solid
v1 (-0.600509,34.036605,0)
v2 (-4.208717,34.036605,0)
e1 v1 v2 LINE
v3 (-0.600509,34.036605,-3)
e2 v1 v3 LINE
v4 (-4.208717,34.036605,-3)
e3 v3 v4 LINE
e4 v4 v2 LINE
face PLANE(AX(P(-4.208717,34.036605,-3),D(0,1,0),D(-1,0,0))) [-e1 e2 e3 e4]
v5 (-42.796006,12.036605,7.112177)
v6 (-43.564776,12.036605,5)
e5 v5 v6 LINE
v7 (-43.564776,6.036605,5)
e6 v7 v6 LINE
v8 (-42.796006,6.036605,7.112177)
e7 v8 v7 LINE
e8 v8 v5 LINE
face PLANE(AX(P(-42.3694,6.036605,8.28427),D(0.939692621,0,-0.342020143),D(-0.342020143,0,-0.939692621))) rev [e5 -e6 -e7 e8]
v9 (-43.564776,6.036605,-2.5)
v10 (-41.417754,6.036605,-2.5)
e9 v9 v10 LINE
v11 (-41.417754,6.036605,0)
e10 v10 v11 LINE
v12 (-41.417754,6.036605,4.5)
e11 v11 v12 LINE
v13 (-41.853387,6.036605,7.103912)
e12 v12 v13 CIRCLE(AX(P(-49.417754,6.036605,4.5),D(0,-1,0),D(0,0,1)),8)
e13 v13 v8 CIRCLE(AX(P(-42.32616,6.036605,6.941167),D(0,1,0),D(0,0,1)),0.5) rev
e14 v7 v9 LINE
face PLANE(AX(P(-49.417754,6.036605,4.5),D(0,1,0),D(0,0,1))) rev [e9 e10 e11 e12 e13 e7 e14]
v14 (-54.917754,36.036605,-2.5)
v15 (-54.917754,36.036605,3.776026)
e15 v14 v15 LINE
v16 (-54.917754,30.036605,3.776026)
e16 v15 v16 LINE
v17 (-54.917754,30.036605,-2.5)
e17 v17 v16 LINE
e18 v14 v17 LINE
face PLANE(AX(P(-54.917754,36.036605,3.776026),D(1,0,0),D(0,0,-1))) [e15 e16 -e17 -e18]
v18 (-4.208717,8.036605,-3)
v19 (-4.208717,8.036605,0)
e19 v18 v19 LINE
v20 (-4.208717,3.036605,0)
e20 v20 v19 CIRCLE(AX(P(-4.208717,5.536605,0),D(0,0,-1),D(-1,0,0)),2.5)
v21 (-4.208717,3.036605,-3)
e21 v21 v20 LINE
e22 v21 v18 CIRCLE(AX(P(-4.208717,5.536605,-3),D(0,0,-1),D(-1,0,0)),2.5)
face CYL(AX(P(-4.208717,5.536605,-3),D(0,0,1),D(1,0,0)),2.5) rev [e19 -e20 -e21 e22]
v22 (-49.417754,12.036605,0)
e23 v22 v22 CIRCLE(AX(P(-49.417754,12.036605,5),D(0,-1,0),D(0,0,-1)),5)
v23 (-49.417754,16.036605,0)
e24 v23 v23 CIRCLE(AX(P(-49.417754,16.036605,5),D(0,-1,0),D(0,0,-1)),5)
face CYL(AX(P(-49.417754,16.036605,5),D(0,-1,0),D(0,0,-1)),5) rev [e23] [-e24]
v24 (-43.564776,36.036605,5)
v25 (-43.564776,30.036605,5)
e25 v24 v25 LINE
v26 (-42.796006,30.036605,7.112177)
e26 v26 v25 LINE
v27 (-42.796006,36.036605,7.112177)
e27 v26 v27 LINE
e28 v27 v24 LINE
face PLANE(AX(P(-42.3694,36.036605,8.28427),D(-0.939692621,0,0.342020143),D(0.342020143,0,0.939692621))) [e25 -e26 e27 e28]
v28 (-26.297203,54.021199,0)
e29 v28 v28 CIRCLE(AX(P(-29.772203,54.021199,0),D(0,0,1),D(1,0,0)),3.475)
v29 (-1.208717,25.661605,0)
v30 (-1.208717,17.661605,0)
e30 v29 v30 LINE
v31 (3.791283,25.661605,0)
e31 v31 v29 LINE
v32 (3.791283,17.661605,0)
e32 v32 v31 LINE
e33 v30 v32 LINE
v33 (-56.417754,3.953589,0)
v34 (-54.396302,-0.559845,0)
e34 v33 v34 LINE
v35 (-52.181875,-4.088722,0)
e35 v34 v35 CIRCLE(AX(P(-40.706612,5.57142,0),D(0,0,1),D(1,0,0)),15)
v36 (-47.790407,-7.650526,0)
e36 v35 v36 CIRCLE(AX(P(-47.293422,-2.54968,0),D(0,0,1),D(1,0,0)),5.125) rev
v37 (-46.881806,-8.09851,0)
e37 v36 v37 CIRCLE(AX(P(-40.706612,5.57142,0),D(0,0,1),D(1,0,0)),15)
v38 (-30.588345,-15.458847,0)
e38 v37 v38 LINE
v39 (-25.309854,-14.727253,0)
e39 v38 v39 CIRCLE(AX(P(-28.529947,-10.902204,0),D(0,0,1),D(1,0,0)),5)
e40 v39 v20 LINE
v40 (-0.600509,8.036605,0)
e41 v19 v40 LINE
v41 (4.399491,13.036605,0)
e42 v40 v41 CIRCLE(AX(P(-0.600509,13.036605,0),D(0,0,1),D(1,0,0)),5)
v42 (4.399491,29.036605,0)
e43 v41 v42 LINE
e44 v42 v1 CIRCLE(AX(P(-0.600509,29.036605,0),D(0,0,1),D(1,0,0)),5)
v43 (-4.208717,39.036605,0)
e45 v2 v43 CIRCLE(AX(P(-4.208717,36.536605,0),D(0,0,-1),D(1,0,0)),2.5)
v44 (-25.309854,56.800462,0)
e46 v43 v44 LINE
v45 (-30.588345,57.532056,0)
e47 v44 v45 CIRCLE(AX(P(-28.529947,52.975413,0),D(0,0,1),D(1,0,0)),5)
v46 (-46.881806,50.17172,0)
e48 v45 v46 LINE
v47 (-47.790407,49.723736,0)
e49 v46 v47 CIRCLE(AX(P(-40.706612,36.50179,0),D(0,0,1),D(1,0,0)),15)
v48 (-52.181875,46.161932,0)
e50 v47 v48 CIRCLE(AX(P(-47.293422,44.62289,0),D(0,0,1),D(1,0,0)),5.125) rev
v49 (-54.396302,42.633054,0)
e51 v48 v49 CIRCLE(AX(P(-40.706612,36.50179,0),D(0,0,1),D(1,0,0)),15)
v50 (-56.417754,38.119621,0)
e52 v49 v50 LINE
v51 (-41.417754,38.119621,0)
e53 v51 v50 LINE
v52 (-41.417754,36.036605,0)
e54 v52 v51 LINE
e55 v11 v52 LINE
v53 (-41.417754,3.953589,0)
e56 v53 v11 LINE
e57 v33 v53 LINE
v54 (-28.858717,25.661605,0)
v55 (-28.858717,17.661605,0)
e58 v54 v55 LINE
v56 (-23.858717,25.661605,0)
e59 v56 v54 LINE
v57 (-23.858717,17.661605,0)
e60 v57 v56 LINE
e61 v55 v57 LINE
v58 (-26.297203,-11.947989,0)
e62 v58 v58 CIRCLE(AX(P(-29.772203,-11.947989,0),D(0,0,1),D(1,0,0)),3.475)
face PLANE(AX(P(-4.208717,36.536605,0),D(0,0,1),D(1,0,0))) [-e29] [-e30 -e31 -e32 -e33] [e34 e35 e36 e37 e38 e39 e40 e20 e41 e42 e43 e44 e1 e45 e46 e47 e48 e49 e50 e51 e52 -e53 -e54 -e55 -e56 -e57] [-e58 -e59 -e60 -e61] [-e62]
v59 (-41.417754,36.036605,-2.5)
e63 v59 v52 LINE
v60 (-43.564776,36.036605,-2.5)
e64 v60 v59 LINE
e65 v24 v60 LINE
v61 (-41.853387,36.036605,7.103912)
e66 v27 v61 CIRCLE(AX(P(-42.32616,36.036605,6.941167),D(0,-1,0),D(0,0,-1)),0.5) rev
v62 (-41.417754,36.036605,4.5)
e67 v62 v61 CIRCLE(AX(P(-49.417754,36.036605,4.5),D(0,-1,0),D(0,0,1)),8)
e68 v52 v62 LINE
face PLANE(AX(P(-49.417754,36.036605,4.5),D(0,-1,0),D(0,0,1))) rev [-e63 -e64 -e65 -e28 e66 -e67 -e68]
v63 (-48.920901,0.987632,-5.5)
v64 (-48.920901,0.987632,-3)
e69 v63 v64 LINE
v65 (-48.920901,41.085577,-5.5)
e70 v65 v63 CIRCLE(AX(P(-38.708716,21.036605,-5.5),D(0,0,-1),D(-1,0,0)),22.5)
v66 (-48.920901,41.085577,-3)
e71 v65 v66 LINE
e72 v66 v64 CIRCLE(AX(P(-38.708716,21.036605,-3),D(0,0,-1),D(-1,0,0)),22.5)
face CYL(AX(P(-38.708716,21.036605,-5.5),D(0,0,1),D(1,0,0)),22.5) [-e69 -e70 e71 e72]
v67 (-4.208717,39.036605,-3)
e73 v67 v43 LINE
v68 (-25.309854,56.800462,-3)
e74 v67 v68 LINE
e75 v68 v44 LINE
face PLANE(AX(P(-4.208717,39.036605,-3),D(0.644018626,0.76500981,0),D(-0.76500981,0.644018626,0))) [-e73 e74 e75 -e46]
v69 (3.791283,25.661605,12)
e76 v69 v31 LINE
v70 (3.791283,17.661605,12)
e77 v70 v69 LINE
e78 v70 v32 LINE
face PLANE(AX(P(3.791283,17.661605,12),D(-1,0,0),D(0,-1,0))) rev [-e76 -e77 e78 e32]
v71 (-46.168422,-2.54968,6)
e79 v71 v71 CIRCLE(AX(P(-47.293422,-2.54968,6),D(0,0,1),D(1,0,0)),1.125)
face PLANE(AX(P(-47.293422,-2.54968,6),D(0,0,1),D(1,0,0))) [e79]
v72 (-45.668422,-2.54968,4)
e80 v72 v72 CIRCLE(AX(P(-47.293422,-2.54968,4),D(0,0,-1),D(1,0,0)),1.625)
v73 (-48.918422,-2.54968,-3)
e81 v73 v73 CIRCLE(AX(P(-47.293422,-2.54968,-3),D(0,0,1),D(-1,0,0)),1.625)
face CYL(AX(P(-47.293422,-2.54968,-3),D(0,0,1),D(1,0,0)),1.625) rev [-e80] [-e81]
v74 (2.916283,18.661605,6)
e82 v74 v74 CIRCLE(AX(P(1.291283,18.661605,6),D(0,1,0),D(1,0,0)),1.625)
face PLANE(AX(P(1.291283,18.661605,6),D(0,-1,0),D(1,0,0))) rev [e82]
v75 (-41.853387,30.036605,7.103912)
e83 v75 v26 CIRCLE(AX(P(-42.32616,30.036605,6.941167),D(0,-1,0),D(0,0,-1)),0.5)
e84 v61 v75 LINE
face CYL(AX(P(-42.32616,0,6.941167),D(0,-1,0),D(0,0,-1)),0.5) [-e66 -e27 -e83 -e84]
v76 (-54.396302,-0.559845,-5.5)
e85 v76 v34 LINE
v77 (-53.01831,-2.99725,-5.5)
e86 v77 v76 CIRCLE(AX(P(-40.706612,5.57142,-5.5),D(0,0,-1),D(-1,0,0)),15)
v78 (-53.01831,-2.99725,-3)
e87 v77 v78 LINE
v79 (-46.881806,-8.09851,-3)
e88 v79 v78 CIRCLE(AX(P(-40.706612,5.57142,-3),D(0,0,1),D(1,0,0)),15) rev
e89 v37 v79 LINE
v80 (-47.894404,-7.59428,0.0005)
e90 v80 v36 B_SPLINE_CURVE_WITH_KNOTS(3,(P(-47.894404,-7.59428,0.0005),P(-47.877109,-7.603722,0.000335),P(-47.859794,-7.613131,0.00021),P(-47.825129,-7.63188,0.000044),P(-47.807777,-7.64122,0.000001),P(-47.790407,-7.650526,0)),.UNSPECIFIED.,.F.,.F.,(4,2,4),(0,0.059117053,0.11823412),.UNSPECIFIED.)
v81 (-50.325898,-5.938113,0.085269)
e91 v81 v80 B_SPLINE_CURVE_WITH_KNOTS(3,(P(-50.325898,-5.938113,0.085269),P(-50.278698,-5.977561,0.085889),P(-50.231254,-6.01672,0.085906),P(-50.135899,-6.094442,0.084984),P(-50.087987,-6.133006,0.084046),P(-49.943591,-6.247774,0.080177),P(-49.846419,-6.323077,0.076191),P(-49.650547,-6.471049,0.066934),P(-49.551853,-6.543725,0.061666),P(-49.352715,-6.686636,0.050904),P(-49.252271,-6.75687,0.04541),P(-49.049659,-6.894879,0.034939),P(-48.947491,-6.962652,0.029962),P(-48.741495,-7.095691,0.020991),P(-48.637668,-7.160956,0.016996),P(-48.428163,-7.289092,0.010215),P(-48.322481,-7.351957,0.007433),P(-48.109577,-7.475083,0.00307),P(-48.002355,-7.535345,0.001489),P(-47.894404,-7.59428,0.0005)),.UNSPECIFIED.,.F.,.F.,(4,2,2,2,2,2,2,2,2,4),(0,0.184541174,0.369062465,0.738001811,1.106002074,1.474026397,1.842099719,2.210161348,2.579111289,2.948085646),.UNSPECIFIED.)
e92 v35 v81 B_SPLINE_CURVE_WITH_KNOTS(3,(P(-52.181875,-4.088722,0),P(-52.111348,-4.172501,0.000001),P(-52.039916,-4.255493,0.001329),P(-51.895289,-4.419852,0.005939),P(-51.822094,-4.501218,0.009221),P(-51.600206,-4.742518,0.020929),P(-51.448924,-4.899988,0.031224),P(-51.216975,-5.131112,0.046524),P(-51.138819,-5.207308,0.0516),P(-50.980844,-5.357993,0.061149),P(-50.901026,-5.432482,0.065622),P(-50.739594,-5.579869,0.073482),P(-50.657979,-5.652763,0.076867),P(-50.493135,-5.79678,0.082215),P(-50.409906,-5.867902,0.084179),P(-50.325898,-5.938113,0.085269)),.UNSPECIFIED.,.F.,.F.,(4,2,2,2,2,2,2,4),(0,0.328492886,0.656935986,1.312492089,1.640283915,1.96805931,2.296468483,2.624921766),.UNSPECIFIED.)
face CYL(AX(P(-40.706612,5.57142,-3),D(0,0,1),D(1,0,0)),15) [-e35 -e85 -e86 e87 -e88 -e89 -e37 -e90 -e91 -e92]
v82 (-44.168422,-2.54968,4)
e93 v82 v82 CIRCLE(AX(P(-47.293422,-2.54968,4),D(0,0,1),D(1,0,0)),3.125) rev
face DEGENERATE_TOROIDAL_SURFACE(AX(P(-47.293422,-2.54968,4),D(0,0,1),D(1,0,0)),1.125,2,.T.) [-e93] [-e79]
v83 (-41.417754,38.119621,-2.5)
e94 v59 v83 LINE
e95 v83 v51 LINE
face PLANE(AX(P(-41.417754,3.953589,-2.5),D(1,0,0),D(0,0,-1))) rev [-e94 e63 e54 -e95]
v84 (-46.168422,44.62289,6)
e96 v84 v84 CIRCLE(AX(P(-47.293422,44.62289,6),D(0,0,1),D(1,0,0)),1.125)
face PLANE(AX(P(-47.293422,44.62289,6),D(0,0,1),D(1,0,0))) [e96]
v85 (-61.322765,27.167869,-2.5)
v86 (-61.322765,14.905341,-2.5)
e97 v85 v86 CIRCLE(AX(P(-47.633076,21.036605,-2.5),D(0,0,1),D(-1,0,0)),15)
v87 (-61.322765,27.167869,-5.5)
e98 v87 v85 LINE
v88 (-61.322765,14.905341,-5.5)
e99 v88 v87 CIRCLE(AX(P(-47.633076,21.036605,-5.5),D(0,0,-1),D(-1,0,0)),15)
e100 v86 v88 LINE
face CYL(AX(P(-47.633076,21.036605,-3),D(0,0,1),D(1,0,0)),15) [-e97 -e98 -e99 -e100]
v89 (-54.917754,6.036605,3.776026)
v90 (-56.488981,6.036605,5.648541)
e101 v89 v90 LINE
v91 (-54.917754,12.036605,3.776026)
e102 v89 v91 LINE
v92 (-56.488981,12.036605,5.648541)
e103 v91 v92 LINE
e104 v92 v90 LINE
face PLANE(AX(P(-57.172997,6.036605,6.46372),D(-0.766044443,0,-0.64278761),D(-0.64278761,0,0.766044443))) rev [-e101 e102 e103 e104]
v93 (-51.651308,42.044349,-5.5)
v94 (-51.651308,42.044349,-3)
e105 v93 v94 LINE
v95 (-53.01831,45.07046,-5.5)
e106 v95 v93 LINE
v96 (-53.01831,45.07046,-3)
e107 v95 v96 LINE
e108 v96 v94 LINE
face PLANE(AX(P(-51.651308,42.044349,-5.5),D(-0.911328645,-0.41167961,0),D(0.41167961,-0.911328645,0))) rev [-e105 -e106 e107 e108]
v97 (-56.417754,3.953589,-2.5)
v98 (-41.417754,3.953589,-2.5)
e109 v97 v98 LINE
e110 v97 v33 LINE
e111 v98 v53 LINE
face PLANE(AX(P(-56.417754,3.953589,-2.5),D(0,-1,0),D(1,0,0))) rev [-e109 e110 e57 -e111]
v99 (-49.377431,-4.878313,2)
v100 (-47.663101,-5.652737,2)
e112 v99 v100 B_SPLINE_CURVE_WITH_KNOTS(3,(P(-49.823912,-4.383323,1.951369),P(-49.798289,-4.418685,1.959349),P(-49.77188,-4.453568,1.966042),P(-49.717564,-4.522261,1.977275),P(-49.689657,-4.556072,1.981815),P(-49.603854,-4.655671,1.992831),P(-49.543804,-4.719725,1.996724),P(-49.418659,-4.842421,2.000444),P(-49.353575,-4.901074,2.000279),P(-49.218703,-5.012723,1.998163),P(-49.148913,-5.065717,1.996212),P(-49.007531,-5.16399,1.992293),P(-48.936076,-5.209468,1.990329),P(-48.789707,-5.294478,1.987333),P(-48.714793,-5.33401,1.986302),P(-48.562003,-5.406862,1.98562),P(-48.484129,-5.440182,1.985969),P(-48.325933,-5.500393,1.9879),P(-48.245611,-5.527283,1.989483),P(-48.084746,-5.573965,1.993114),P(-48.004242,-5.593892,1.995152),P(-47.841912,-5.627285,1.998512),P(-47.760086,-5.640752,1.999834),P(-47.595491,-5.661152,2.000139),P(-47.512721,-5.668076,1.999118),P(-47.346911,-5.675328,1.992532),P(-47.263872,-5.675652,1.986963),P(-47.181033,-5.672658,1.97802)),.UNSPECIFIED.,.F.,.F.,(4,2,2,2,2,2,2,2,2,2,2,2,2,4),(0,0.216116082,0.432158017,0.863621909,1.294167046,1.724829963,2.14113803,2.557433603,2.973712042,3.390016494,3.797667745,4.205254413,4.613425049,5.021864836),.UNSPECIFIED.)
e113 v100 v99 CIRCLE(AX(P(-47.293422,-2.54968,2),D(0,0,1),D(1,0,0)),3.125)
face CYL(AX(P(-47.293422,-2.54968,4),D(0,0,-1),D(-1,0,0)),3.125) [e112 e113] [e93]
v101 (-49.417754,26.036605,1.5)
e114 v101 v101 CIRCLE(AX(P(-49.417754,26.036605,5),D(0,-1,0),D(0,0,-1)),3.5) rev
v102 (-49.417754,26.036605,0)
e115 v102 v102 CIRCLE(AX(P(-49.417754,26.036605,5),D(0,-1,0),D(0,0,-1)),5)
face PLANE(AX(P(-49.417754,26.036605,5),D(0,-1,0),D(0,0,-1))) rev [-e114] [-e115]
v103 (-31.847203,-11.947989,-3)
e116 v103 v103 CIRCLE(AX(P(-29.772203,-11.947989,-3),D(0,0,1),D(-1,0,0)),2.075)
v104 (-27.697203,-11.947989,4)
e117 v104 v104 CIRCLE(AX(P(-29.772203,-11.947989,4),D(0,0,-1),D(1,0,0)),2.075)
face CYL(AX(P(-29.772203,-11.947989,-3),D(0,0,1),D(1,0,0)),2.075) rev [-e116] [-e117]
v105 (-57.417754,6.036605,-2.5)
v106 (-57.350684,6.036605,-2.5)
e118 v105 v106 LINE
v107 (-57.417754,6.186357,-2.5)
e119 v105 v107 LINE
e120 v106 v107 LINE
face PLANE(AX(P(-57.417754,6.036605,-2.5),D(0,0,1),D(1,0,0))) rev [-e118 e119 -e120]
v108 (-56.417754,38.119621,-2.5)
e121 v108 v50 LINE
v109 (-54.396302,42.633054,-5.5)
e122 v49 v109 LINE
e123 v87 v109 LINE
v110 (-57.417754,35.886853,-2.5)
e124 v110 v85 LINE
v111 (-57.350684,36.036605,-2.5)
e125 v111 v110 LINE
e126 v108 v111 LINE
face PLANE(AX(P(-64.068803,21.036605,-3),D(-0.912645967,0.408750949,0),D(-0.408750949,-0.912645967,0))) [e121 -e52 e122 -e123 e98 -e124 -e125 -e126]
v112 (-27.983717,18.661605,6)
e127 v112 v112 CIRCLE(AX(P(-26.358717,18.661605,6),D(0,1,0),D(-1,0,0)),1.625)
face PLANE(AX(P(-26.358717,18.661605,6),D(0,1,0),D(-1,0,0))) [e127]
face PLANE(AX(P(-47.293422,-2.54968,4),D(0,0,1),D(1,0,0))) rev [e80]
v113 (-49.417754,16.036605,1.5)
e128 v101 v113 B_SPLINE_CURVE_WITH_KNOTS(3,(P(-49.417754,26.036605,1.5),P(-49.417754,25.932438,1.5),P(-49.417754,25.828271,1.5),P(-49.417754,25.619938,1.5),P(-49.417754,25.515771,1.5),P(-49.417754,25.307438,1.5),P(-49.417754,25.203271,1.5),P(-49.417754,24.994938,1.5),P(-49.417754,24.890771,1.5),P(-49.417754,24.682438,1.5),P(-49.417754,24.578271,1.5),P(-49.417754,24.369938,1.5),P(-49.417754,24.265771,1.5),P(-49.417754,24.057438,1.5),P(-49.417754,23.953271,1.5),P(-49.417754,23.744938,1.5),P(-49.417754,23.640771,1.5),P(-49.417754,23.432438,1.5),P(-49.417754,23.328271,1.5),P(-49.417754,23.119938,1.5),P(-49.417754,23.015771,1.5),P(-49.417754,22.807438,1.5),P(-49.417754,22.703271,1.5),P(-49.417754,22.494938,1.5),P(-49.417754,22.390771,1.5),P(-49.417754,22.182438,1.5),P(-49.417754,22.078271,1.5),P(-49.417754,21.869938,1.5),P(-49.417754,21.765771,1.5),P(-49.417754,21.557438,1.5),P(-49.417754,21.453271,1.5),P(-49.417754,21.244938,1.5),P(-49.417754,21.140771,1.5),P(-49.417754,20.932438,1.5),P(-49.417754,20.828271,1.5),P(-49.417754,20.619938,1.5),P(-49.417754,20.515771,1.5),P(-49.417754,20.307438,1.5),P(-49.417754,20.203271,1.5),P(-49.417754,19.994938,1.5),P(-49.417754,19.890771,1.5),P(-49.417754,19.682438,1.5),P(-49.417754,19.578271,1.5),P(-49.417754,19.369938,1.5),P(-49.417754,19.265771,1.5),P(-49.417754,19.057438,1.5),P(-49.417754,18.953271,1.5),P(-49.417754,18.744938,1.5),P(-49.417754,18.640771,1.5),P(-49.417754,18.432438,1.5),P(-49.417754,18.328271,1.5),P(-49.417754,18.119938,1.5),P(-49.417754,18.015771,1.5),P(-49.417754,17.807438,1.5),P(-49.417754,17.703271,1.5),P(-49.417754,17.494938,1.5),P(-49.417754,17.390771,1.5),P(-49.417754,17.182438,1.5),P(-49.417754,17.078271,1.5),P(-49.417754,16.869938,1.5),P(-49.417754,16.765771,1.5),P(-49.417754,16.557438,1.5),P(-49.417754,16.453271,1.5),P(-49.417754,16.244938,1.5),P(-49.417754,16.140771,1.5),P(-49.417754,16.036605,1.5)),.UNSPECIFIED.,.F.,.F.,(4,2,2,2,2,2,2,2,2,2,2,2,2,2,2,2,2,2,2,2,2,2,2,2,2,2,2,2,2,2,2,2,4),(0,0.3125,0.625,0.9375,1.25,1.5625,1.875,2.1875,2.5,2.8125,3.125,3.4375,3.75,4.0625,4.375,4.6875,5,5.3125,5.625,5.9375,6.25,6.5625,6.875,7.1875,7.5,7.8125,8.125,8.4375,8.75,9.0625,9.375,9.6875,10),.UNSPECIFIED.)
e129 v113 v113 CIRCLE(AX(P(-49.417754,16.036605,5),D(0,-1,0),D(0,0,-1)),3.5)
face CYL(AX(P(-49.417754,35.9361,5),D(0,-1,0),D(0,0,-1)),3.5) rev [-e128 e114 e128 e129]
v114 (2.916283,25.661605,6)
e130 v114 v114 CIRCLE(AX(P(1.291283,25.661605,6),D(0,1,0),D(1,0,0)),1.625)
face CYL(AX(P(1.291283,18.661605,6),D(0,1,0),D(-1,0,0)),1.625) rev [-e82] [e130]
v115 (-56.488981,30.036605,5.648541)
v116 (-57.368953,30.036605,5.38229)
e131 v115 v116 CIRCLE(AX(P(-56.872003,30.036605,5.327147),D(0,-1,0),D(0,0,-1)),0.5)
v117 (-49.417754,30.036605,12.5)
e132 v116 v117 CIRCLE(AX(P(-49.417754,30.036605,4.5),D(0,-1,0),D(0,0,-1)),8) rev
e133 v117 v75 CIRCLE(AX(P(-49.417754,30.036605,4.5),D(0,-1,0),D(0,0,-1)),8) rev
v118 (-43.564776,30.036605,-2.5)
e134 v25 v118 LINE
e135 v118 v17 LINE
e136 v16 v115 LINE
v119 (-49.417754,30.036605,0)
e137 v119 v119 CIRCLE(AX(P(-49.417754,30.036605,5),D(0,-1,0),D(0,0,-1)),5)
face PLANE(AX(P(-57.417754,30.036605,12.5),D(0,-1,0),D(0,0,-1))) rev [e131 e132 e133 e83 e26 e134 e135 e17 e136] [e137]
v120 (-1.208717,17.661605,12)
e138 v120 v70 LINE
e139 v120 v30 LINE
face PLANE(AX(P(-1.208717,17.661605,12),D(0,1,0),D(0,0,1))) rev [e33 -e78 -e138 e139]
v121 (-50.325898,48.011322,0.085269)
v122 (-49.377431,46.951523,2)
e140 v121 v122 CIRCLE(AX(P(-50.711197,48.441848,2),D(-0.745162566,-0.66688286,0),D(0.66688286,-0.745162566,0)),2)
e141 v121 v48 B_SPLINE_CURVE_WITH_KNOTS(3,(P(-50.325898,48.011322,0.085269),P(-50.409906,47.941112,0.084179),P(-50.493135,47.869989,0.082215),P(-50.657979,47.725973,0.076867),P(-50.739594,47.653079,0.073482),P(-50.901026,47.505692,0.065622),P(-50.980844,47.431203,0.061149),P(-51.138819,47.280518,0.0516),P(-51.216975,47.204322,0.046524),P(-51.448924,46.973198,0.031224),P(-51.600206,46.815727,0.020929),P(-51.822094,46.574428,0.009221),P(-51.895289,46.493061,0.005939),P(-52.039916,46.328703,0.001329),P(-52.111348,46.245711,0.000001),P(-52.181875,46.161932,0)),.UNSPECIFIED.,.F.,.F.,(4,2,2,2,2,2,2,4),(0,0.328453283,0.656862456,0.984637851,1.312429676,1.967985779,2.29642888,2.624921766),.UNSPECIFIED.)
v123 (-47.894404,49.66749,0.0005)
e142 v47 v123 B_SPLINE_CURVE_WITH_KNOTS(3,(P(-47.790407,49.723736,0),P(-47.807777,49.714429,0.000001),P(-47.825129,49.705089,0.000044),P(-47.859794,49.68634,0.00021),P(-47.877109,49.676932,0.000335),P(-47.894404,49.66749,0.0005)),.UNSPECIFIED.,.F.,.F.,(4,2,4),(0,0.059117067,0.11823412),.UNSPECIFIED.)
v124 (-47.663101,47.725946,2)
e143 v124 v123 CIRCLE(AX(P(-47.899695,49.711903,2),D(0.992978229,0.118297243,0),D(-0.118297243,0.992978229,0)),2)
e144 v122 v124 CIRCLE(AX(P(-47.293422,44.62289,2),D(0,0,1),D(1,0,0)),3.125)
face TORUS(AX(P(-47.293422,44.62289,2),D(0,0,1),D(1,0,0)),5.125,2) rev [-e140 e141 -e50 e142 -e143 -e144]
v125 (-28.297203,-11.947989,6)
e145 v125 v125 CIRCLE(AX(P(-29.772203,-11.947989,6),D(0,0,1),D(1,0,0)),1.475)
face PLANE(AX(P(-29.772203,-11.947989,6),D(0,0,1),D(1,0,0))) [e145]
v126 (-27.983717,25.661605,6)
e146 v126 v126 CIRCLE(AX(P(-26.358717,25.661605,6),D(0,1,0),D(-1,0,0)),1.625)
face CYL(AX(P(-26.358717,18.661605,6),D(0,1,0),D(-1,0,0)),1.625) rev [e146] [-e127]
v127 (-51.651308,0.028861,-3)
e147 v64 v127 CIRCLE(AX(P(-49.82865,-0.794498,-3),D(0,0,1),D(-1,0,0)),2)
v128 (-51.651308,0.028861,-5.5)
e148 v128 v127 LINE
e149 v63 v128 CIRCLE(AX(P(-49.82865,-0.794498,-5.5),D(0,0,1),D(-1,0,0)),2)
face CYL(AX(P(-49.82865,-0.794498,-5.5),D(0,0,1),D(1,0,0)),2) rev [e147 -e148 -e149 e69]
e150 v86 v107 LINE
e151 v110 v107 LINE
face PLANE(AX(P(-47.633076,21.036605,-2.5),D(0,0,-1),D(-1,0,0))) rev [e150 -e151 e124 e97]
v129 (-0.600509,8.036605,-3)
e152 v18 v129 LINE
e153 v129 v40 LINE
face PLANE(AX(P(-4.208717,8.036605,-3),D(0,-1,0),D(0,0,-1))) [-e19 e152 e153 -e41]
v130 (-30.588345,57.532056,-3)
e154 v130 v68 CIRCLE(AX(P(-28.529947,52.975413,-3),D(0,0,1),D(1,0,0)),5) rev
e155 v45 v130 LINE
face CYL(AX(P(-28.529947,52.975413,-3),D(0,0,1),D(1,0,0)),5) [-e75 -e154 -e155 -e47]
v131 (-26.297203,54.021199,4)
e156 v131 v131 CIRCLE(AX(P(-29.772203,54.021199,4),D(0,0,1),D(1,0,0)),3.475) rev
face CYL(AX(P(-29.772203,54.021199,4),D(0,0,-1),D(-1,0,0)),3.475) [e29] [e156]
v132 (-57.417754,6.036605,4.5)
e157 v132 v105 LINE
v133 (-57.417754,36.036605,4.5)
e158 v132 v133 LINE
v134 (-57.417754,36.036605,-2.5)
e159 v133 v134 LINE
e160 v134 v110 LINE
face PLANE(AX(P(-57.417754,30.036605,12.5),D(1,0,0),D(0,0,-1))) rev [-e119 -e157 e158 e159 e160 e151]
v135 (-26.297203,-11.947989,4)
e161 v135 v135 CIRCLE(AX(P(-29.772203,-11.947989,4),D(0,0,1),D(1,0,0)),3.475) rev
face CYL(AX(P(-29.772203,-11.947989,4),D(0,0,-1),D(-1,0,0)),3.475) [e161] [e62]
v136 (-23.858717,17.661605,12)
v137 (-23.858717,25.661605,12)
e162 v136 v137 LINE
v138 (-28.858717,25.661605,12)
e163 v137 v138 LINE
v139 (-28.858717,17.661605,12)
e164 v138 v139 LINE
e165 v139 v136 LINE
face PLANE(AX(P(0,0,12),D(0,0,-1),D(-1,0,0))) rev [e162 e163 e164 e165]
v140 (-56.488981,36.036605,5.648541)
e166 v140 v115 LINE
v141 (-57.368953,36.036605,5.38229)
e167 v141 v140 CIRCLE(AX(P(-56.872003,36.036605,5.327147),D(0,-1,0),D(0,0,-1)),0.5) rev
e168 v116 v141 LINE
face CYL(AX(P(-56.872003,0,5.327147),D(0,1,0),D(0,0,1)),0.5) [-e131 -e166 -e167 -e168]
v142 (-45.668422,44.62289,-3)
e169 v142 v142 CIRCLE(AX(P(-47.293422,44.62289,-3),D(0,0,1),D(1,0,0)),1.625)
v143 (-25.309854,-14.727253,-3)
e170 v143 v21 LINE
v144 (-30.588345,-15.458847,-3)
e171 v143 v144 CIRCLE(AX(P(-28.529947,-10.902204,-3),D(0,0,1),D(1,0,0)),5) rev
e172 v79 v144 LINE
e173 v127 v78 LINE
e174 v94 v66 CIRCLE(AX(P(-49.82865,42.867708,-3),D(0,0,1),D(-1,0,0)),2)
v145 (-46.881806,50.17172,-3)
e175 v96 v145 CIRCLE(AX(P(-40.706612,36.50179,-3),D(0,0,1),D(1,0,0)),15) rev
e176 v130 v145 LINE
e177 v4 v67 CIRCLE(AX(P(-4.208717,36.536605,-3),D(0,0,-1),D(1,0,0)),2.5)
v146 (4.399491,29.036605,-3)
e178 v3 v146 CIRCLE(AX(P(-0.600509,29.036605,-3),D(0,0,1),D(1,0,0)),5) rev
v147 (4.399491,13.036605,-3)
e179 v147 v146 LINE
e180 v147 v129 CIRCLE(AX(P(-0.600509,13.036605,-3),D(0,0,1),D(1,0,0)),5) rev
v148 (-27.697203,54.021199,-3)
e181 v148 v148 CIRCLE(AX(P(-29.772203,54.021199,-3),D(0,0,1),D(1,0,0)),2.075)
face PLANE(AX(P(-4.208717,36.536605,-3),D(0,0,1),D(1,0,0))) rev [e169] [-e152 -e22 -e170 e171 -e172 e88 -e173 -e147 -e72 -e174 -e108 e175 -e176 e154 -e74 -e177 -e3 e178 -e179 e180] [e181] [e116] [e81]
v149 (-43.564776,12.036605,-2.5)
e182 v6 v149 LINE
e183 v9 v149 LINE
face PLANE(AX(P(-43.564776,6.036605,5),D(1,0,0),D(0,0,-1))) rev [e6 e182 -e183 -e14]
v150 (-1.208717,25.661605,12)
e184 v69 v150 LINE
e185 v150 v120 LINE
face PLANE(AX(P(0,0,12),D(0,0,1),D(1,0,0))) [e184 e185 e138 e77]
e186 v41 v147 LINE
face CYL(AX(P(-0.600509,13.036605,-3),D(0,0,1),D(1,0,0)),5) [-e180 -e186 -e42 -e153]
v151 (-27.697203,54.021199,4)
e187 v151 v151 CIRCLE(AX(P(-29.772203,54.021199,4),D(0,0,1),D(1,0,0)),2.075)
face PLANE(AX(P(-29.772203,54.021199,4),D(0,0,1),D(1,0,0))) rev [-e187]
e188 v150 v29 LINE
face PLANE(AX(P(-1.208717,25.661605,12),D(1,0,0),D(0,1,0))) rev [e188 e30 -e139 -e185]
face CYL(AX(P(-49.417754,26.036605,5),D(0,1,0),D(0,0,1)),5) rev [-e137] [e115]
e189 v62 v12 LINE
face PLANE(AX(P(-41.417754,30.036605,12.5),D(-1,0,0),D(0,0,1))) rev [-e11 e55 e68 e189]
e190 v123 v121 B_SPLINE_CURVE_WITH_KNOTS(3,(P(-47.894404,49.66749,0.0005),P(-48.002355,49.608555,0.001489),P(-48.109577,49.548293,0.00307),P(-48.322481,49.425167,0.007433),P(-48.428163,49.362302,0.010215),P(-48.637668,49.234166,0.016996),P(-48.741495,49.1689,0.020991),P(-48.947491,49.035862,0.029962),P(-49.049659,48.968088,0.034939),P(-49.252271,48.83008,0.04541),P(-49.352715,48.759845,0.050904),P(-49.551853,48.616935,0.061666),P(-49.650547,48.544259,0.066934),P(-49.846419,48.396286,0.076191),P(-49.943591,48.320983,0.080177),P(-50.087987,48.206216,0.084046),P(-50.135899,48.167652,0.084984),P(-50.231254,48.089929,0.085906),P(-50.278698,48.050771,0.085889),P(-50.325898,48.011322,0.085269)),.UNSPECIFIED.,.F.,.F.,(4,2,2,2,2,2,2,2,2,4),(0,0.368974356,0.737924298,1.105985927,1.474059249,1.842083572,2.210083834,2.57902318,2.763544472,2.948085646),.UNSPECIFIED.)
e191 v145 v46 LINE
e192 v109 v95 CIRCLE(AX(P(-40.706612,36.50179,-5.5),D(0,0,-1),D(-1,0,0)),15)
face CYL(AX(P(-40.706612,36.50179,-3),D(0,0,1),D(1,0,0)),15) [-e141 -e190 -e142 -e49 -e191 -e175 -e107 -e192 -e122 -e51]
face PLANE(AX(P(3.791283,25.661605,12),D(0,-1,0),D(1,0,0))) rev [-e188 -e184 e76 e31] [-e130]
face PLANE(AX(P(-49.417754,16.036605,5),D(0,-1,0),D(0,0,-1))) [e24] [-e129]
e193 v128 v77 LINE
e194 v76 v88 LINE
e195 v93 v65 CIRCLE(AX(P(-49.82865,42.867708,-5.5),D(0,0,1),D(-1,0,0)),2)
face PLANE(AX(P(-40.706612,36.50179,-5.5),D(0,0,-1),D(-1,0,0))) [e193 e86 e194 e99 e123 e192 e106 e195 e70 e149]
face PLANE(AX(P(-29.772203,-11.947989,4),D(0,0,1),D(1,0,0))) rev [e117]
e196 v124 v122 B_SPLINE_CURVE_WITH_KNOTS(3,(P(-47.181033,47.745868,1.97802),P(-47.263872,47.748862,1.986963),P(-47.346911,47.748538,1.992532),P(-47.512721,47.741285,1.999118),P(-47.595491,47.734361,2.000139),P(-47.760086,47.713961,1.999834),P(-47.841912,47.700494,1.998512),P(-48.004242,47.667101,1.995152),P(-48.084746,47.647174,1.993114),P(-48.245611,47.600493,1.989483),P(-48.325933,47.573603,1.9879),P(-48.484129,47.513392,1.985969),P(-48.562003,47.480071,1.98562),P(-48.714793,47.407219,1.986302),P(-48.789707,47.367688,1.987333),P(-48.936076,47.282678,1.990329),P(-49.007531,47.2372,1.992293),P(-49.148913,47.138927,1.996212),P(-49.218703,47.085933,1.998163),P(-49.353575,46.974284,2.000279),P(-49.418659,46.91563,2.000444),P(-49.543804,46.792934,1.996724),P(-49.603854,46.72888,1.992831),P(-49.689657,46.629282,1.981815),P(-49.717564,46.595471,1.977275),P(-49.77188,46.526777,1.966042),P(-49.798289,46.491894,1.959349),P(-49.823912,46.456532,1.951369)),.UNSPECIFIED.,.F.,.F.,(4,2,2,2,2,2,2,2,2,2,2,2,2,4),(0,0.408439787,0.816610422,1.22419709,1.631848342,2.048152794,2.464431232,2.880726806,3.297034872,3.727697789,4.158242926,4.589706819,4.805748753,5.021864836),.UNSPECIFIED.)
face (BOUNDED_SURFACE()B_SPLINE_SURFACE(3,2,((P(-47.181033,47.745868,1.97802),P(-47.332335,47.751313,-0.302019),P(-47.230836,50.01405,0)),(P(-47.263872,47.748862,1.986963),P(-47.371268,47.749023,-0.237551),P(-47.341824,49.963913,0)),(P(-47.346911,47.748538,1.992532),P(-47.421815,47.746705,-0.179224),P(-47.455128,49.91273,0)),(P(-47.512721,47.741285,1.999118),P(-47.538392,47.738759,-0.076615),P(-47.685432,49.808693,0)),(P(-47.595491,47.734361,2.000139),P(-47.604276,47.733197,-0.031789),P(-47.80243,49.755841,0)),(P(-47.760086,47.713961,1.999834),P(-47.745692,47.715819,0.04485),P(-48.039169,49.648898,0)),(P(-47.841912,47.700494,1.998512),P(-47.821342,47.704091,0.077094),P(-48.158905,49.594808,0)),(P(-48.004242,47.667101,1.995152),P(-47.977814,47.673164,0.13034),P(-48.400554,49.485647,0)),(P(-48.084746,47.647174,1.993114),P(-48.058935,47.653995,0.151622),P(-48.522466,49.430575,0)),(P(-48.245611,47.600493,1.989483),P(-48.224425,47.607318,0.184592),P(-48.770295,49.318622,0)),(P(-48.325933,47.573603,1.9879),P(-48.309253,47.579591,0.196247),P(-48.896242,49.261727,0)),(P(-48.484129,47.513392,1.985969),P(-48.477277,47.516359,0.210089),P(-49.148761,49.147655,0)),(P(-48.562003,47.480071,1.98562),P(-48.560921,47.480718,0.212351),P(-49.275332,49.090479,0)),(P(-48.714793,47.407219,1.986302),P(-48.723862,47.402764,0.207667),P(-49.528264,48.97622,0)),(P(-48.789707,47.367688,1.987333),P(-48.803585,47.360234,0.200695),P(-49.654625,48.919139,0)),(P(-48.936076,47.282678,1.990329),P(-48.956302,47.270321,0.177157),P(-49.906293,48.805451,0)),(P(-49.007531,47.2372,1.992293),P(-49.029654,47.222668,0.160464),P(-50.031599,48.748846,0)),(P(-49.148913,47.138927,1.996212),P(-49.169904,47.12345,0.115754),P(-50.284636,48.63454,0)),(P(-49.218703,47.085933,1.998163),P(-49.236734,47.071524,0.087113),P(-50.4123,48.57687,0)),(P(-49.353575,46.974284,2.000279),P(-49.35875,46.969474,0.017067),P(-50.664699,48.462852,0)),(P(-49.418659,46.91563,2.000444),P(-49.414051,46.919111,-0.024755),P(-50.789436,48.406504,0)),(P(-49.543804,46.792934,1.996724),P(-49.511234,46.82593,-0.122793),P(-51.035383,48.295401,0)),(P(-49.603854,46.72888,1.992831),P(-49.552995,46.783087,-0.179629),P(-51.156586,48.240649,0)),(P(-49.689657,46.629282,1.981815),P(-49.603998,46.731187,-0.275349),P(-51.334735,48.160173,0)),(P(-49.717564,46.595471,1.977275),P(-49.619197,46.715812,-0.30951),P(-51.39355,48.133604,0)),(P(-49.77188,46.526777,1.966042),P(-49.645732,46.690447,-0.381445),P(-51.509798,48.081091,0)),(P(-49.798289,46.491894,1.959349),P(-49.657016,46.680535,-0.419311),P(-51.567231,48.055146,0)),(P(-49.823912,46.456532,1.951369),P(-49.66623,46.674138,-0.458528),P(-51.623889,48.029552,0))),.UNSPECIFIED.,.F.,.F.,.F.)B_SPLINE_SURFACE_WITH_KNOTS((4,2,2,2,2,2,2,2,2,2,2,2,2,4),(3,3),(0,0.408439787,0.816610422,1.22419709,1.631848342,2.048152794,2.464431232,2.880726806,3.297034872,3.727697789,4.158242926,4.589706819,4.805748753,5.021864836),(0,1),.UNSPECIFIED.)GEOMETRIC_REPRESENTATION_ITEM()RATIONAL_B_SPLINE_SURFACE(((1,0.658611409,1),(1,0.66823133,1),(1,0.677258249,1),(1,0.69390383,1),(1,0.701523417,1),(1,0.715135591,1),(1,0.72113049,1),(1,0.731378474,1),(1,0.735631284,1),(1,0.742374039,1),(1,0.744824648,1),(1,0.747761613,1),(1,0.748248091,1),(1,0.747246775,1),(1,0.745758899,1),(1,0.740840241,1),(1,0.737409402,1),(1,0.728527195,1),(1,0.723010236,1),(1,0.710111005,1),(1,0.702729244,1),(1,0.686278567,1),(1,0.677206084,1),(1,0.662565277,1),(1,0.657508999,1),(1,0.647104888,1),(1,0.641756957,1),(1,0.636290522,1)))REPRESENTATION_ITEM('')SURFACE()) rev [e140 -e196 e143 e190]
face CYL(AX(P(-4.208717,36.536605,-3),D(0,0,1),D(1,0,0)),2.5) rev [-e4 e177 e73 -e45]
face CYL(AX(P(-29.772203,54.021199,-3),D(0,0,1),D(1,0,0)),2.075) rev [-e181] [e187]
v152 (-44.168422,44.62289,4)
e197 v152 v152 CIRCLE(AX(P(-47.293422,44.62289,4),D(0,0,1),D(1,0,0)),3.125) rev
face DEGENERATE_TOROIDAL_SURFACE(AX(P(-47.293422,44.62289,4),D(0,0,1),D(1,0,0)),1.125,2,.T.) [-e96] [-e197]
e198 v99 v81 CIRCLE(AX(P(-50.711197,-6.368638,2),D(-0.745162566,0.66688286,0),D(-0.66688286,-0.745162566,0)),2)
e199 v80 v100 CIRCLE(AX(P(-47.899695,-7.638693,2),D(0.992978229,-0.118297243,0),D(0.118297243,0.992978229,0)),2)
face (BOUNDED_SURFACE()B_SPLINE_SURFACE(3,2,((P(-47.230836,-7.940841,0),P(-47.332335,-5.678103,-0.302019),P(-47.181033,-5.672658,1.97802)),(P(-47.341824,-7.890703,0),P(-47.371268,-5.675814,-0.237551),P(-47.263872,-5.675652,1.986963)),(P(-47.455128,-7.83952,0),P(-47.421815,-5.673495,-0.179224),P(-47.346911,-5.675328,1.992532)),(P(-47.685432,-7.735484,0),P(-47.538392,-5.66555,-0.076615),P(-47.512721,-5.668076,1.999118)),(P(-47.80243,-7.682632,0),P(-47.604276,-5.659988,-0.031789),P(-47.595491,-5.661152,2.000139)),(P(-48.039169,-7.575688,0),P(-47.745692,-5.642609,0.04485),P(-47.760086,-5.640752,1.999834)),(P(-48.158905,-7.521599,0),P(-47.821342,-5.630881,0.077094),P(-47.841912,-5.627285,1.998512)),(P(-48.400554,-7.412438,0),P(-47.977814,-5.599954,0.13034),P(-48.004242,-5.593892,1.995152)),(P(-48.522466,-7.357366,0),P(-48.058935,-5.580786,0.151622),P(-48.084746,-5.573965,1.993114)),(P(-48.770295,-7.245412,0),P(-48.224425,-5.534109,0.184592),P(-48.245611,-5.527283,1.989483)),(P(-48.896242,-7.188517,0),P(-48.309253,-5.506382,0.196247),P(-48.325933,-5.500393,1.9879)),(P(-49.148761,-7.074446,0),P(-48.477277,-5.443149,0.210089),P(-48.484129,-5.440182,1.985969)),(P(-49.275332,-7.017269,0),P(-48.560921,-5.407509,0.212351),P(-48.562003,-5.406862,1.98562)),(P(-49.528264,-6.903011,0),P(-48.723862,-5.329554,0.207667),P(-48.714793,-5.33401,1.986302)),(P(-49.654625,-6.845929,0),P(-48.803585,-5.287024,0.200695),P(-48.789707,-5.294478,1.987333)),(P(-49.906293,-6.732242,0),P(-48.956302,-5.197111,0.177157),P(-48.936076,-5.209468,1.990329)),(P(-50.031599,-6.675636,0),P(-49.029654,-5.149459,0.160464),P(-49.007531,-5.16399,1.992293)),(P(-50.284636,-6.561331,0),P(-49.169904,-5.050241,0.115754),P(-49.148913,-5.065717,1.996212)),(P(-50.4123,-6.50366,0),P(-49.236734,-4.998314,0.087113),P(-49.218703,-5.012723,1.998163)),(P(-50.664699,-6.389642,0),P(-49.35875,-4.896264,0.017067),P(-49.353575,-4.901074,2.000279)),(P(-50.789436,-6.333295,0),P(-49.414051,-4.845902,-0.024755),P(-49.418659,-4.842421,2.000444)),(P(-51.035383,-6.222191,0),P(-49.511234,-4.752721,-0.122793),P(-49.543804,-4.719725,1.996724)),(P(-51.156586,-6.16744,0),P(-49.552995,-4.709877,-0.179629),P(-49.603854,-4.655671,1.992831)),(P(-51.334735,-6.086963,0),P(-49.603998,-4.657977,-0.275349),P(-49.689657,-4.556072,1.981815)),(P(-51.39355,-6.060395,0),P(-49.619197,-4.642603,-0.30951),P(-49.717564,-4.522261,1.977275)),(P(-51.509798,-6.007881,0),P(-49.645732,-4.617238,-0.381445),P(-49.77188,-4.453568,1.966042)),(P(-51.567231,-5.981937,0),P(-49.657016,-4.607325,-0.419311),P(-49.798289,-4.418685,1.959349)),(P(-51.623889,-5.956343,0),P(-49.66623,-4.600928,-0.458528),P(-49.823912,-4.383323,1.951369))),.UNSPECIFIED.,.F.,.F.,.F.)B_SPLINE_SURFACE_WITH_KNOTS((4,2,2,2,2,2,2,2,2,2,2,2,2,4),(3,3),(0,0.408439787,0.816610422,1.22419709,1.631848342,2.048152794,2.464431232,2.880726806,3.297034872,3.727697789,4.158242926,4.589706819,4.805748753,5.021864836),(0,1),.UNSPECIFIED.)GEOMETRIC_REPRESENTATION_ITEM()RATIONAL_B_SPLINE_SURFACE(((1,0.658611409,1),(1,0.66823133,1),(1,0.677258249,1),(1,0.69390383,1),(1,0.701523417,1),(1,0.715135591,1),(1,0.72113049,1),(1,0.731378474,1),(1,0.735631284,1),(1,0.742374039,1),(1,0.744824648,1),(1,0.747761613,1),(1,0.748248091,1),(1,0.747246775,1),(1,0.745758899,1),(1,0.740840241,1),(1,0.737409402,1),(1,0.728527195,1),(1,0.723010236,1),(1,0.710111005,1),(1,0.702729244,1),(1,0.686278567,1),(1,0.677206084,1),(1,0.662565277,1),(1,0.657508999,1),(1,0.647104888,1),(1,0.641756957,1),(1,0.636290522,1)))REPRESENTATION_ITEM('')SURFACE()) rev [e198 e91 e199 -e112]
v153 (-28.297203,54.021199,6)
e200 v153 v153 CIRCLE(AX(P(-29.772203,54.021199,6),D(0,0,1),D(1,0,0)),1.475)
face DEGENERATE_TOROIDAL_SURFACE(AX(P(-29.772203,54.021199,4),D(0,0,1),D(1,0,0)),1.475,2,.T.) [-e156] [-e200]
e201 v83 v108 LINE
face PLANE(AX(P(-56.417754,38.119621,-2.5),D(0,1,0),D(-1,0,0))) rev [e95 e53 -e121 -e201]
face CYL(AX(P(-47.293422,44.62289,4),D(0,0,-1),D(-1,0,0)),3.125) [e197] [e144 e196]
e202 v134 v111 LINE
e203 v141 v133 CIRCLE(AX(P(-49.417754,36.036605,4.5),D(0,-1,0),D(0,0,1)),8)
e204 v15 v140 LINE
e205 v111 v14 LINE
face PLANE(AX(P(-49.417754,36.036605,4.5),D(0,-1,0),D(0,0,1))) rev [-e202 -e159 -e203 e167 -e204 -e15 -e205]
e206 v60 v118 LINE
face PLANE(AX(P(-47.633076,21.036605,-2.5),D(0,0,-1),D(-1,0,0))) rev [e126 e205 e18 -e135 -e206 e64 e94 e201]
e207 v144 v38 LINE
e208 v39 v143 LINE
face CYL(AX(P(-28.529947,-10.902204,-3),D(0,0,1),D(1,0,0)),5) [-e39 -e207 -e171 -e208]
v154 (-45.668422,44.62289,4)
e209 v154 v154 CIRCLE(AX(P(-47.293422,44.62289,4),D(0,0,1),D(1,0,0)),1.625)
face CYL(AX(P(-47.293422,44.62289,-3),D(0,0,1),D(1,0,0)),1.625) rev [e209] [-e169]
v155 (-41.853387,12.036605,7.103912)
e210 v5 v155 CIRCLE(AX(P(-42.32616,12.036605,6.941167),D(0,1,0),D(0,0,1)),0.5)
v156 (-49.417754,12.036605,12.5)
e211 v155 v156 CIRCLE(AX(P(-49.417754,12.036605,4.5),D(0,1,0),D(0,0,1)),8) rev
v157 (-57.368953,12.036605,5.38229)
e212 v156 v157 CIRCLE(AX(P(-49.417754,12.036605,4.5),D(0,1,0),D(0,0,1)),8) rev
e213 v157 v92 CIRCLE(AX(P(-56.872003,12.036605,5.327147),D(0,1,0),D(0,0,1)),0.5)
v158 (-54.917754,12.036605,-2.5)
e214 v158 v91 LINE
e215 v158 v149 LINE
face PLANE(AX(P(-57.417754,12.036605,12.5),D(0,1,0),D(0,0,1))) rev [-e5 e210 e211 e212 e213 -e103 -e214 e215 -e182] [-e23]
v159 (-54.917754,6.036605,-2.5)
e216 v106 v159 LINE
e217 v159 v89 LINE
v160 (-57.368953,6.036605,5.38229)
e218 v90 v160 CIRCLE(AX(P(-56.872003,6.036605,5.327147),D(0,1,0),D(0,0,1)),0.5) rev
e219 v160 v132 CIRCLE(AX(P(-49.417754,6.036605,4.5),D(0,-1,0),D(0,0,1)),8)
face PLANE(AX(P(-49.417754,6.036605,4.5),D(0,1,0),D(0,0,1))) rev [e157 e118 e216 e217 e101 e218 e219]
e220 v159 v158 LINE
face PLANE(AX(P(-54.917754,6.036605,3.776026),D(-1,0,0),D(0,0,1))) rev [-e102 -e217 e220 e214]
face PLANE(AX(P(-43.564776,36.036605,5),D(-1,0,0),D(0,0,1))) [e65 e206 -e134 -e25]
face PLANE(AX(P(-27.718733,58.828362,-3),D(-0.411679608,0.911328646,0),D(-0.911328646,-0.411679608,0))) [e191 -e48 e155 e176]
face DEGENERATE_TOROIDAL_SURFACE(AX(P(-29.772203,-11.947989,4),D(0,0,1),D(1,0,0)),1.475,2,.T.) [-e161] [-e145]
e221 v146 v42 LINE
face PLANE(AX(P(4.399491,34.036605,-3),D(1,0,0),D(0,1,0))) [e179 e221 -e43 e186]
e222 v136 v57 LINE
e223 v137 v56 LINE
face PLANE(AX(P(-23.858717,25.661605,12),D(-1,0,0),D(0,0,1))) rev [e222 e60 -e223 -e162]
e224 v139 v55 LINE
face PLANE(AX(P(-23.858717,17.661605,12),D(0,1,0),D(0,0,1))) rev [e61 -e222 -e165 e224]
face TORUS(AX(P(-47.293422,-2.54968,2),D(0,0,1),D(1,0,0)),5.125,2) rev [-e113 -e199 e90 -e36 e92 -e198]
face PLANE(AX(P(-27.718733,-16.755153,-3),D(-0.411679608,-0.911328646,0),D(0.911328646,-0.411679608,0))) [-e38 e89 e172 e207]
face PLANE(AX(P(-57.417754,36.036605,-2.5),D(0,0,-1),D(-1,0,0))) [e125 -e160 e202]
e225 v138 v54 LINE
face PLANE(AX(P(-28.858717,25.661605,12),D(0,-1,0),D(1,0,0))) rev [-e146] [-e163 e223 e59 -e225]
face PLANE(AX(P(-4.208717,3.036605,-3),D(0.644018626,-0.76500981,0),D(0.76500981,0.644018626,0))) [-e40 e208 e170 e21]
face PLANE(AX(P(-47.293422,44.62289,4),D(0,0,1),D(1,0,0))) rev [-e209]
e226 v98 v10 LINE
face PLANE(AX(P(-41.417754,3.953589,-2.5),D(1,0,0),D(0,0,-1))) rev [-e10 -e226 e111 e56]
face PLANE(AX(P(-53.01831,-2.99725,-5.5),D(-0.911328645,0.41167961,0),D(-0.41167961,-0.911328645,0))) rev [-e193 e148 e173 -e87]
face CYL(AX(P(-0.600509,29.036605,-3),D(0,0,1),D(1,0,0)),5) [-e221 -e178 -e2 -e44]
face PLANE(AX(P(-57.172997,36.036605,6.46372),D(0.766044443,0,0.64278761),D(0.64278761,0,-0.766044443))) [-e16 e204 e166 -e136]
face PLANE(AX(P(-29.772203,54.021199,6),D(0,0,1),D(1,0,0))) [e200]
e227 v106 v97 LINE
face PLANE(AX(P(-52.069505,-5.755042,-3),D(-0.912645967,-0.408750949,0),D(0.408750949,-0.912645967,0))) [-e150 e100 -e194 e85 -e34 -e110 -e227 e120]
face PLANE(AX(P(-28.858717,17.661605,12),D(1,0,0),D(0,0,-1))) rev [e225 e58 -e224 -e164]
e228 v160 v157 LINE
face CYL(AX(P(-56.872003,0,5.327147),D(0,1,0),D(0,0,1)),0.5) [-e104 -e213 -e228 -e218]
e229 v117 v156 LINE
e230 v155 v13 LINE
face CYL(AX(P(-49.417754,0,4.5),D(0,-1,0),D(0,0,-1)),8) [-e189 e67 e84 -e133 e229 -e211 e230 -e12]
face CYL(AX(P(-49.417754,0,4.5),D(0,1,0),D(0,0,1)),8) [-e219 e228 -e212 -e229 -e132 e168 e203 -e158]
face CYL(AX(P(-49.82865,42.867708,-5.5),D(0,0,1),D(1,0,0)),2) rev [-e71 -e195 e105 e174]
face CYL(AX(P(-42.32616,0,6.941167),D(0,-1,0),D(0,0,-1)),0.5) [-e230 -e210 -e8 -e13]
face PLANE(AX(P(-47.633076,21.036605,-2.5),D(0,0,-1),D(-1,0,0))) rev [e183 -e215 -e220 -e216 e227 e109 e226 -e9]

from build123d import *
from build123d.topology import SkipClean

# Parameters (mm, degrees)
CROQUIS3_R                = 2.075
CROQUIS3_R_2              = 1.625
SALIENTE_EXTRUIR1_DEPTH   = 3
CROQUIS5_W                = 5
CROQUIS5_H                = 8
SALIENTE_EXTRUIR2_DEPTH   = 12
CROQUIS6_R                = 1.625
CORTAR_EXTRUIR1_DEPTH     = 7
SALIENTE_EXTRUIR4_START   = 4
CROQUIS10_R               = 3.125
CROQUIS10_R_2             = 1.625
CROQUIS10_R_3             = 3.475
CROQUIS10_R_4             = 2.075
SALIENTE_EXTRUIR4_DEPTH   = 4
SALIENTE_EXTRUIR5_START   = 2
CROQUIS11_R               = 3.125
CROQUIS11_R_2             = 3.475
SALIENTE_EXTRUIR5_DEPTH   = 2
REDONDEO3_R               = 2
REDONDEO3_OF_SIMETR_A2_R  = 2
REDONDEO4_R               = 15
REDONDEO5_R               = 5
SALIENTE_EXTRUIR6_DEPTH   = 2.5
CORTAR_EXTRUIR5_DEPTH     = 2.5
CROQUIS16_W               = 16
CROQUIS16_H               = 18
SALIENTE_EXTRUIR7_DEPTH   = 15
CROQUIS8_R                = 5
CORTAR_EXTRUIR2_DEPTH     = 4
CORTAR_EXTRUIR3_START     = -14
CROQUIS8_2_R              = 5
CORTAR_EXTRUIR3_DEPTH     = 4
CROQUIS12_R               = 3.5
CORTAR_EXTRUIR4_DEPTH     = 10
REDONDEO6_R               = 8
SALIENTE_EXTRUIR8_DEPTH   = 6
REDONDEO10_R              = 0.5
REDONDEO10_OF_SIMETR_A3_R = 0.5


# Some blends are built 0.0001 mm under size
with BuildPart() as part:
    # Croquis3 → Saliente-Extruir1 (new body)
    with BuildSketch(Plane.XY):
        with BuildLine():
            Line((-4.208716739, 39.036604707), (-27.718733391, 58.828362176))
            Line((-27.718733391, 58.828362176), (-52.069504728, 47.828251475))
            Line((-52.069504728, 47.828251475), (-64.068802802, 21.036604802))
            Line((-64.068802802, 21.036604802), (-52.069504728, -5.75504187))
            Line((-52.069504728, -5.75504187), (-27.718733391, -16.755152571))
            Line((-27.718733391, -16.755152571), (-4.208716739, 3.036604898))
            ThreePointArc((-4.208716739, 3.036604898), (-6.708716739, 5.536604898), (-4.208716739, 8.036604898))
            Line((-4.208716739, 8.036604898), (4.399490704, 8.036604898))
            Line((4.399490704, 8.036604898), (4.399490704, 34.036604707))
            Line((4.399490704, 34.036604707), (-4.208716739, 34.036604707))
            ThreePointArc((-4.208716739, 34.036604707), (-6.708716739, 36.536604707), (-4.208716739, 39.036604707))
        make_face()
        with Locations((-29.772203367, 54.02119887)):
            Circle(CROQUIS3_R, mode=Mode.SUBTRACT)
        with Locations((-47.293421877, 44.62288951)):
            Circle(CROQUIS3_R_2, mode=Mode.SUBTRACT)
        with Locations(Location((-47.293421877, -2.549679905, 0), (0, 0, 180))):
            Circle(CROQUIS3_R_2, mode=Mode.SUBTRACT)
        with Locations(Location((-29.772203367, -11.947989265, 0), (0, 0, 180))):
            Circle(CROQUIS3_R, mode=Mode.SUBTRACT)
    extrude(amount=-SALIENTE_EXTRUIR1_DEPTH)

    # Croquis5 → Saliente-Extruir2 (add)
    with BuildSketch(Plane.XY):
        with Locations((-26.358716739, 21.661604802)):
            Rectangle(CROQUIS5_W, CROQUIS5_H)
        with Locations((1.291283261, 21.661604802)):
            Rectangle(CROQUIS5_W, CROQUIS5_H)
    extrude(amount=SALIENTE_EXTRUIR2_DEPTH)

    # Croquis6 → Cortar-Extruir1 (cut)
    with BuildSketch(Plane(origin=(0, 25.661604802, 0), x_dir=(1, 0, 0), z_dir=(0, 1, 0))):
        with Locations(Location((-26.358716739, -6, 0), (0, 0, 180))):
            Circle(CROQUIS6_R)
        with Locations((1.291283261, -6)):
            Circle(CROQUIS6_R)
    extrude(amount=-CORTAR_EXTRUIR1_DEPTH, mode=Mode.SUBTRACT)

    # Croquis10 → Saliente-Extruir4 (add)
    # profile 1 of 2: a face of its own
    with BuildSketch(Plane.XY.offset(SALIENTE_EXTRUIR4_START)):
        with Locations((-47.293421877, 44.62288951)):
            Circle(CROQUIS10_R)
        with Locations((-47.293421877, 44.62288951)):
            Circle(CROQUIS10_R_2, mode=Mode.SUBTRACT)
    # profile 2 of 2: a face of its own
    with BuildSketch(Plane.XY.offset(SALIENTE_EXTRUIR4_START)):
        with Locations((-29.772203367, 54.02119887)):
            Circle(CROQUIS10_R_3)
        with Locations((-29.772203367, 54.02119887)):
            Circle(CROQUIS10_R_4, mode=Mode.SUBTRACT)
    saliente_extruir4 = extrude(amount=-SALIENTE_EXTRUIR4_DEPTH)

    # Croquis11 → Saliente-Extruir5 (add)
    with BuildSketch(Plane.XY.offset(4).offset(SALIENTE_EXTRUIR5_START)):
        with Locations((-47.293421877, 44.62288951)):
            Circle(CROQUIS11_R)
        with Locations((-29.772203367, 54.02119887)):
            Circle(CROQUIS11_R_2)
    saliente_extruir5 = extrude(amount=-SALIENTE_EXTRUIR5_DEPTH)

    # Redondeo3
    redondeo3_edges = [part.edges().sort_by_distance(p)[0] for p in [
        (-33.247203367, 54.02119887, 6),
        (-50.418421877, 44.62288951, 0),
        (-50.418421877, 44.62288951, 6),
    ]]
    fillet(redondeo3_edges, radius=REDONDEO3_R)

    # Simetría2: Saliente-Extruir4, Saliente-Extruir5 across plane
    add(saliente_extruir4.mirror(Plane(origin=(0, 21.036604802, 0), x_dir=(0, 0, 1), z_dir=(0, -1, 0))))
    add(saliente_extruir5.mirror(Plane(origin=(0, 21.036604802, 0), x_dir=(0, 0, 1), z_dir=(0, -1, 0))))

    # Redondeo3 of Simetría2
    redondeo3_of_simetr_a2_edges = [part.edges().sort_by_distance(p)[0] for p in [
        (-33.247203367, -11.947989265, 6),
        (-50.418421877, -2.549679905, 0),
        (-50.418421877, -2.549679905, 6),
    ]]
    fillet(redondeo3_of_simetr_a2_edges, radius=REDONDEO3_OF_SIMETR_A2_R)

    # Redondeo4
    # the kernel refuses this fillet: 15 mm, written as the material it takes off along each edge
    with BuildSketch(Plane(origin=(-52.069504728, -5.75504187, 14.231140734), x_dir=(-0.4087509488611458, 0.9126459673965106, 0), z_dir=(0, 0, -1))) as redondeo4_piece_1:
        with BuildLine():
            CenterArc((REDONDEO4_R * 0.379497086232, REDONDEO4_R), REDONDEO4_R, 228.436784363, 41.563215637)
            Line((-REDONDEO4_R * 0.283948897091, REDONDEO4_R * 0.251775817543), (0, 0))
            Line((0, 0), (REDONDEO4_R * 0.379497086232, 0))
        make_face()
    extrude(amount=31.462281467, mode=Mode.SUBTRACT)
    with BuildSketch(Plane(origin=(-64.068802802, 21.036604802, 16.795297552), x_dir=(0.40875094886114643, -0.9126459673965104, 0), z_dir=(0, 0, -1))) as redondeo4_piece_2:
        with BuildLine():
            CenterArc((REDONDEO4_R * 0.447874601394, -REDONDEO4_R), REDONDEO4_R, 90, 48.252790965)
            Line((-REDONDEO4_R * 0.298215208902, -REDONDEO4_R * 0.33415467639), (0, 0))
            Line((0, 0), (REDONDEO4_R * 0.447874601394, 0))
        make_face()
    extrude(amount=36.590595105, mode=Mode.SUBTRACT)
    with BuildSketch(Plane(origin=(-52.069504728, 47.828251475, 14.231140734), x_dir=(-0.40875094886114616, -0.9126459673965105, 0), z_dir=(0, 0, -1))) as redondeo4_piece_3:
        with BuildLine():
            CenterArc((REDONDEO4_R * 0.379497086232, -REDONDEO4_R), REDONDEO4_R, 90, 41.563215637)
            Line((-REDONDEO4_R * 0.283948897091, -REDONDEO4_R * 0.251775817543), (0, 0))
            Line((0, 0), (REDONDEO4_R * 0.379497086232, 0))
        make_face()
    extrude(amount=31.462281467, mode=Mode.SUBTRACT)

    # Redondeo5
    redondeo5_edges = [part.edges().sort_by_distance(p)[0] for p in [
        (4.399490704, 34.036604707, -1.5),
        (4.399490704, 8.036604898, -1.5),
        (-27.718733391, -16.755152571, -1.5),
        (-27.718733391, 58.828362176, -1.5),
    ]]
    fillet(redondeo5_edges, radius=REDONDEO5_R)

    # Croquis14 → Saliente-Extruir6 (add)
    with SkipClean():  # the faces are left unmerged after this step: merging them gives an invalid solid
        with BuildSketch(Plane(origin=(0, 0, -3), x_dir=(-1, 0, 0), z_dir=(0, 0, -1))):
            with BuildLine():
                Line((53.018309819, -2.99725003), (51.651307757, 0.028860824))
                ThreePointArc((51.651307757, 0.028860824), (50.491277609, 1.09254301), (48.920900738, 0.987632471))
                ThreePointArc((48.920900738, 0.987632471), (16.208716279, 21.036604736), (48.920900752, 41.085576979))
                ThreePointArc((48.920900752, 41.085576979), (50.491277623, 40.980666438), (51.651307772, 42.044348625))
                Line((51.651307772, 42.044348625), (53.018309871, 45.07045956))
                ThreePointArc((53.018309871, 45.07045956), (53.764302238, 43.883979947), (54.396301639, 42.633054194))
                Line((54.396301639, 42.633054194), (61.322765277, 27.167869035))
                ThreePointArc((61.322765277, 27.167869035), (62.633075767, 21.036604802), (61.322765277, 14.90534057))
                Line((61.322765277, 14.90534057), (54.396301639, -0.559844589))
                ThreePointArc((54.396301639, -0.559844589), (53.764302216, -1.810770382), (53.018309819, -2.99725003))
            make_face()
        extrude(amount=SALIENTE_EXTRUIR6_DEPTH)

    # Croquis15 → Cortar-Extruir5 (cut)
    with SkipClean():  # the faces are left unmerged after this step: merging them gives an invalid solid
        with BuildSketch(Plane.XY):
            with BuildLine():
                Line((-61.322765277, 14.90534057), (-56.417753891, 3.953588961))
                Line((-56.417753891, 3.953588961), (-41.417753891, 3.953588961))
                Line((-41.417753891, 3.953588961), (-41.417753891, 38.119620644))
                Line((-41.417753891, 38.119620644), (-56.417753891, 38.119620644))
                Line((-56.417753891, 38.119620644), (-61.322765277, 27.167869035))
                ThreePointArc((-61.322765277, 27.167869035), (-62.633075767, 21.036604802), (-61.322765277, 14.90534057))
            make_face()
        extrude(amount=-CORTAR_EXTRUIR5_DEPTH, mode=Mode.SUBTRACT)

    # Croquis16 → Saliente-Extruir7 (add)
    with SkipClean():  # the faces are left unmerged after this step: merging them gives an invalid solid
        with BuildSketch(Plane.XY.offset(-2.5)):
            with Locations((-49.417753891, 21.036604802)):
                Rectangle(CROQUIS16_W, CROQUIS16_H)
        extrude(amount=SALIENTE_EXTRUIR7_DEPTH)

    # Croquis8 → Cortar-Extruir2 (cut)
    with SkipClean():  # the faces are left unmerged after this step: merging them gives an invalid solid
        with BuildSketch(Plane.XZ.offset(-12.036604802)):
            with Locations(Location((-49.417753891, 5, 0), (0, 0, 270))):
                Circle(CROQUIS8_R)
        extrude(amount=-CORTAR_EXTRUIR2_DEPTH, mode=Mode.SUBTRACT)

    # Croquis8<2> → Cortar-Extruir3 (cut)
    with SkipClean():  # the faces are left unmerged after this step: merging them gives an invalid solid
        with BuildSketch(Plane.XZ.offset(-12.036604802).offset(CORTAR_EXTRUIR3_START)):
            with Locations(Location((-49.417753891, 5, 0), (0, 0, 270))):
                Circle(CROQUIS8_2_R)
        extrude(amount=-CORTAR_EXTRUIR3_DEPTH, mode=Mode.SUBTRACT)

    # Croquis12 → Cortar-Extruir4 (cut)
    with SkipClean():  # the faces are left unmerged after this step: merging them gives an invalid solid
        with BuildSketch(Plane.XZ.offset(-16.036604802)):
            with Locations(Location((-49.417753891, 5, 0), (0, 0, 270))):
                Circle(CROQUIS12_R)
        extrude(amount=-CORTAR_EXTRUIR4_DEPTH, mode=Mode.SUBTRACT)

    # Redondeo6
    redondeo6_edges = [part.edges().sort_by_distance(p)[0] for p in [
        (-41.417753891, 21.036604802, 12.5),
        (-57.417753891, 21.036604802, 12.5),
    ]]
    fillet(redondeo6_edges, radius=REDONDEO6_R - 0.0001)  # a hair under: the kernel refuses the full size

    # Croquis17 → Saliente-Extruir8 (add)
    with BuildSketch(Plane.XZ.offset(-12.036604802)):
        with BuildLine():
            Line((-54.917753891, 3.776025625), (-54.917753891, -2.5))
            Line((-54.917753891, -2.5), (-57.417753891, -2.5))
            Line((-57.417753891, -2.5), (-57.417753891, 4.5))
            ThreePointArc((-57.417753891, 4.5), (-57.356328969, 5.489457291), (-57.172997458, 6.463720248))
            Line((-57.172997458, 6.463720248), (-54.917753891, 3.776025625))
        make_face()
        with BuildLine():
            Line((-41.417753891, 4.5), (-41.417753891, -2.5))
            Line((-41.417753891, -2.5), (-43.564776143, -2.5))
            Line((-43.564776143, -2.5), (-43.564776143, 5))
            Line((-43.564776143, 5), (-42.369399545, 8.284270209))
            ThreePointArc((-42.369399545, 8.284270209), (-41.659312206, 6.451046544), (-41.417753891, 4.5))
        make_face()
    saliente_extruir8 = extrude(amount=SALIENTE_EXTRUIR8_DEPTH)

    # Redondeo10
    redondeo10_edges = [part.edges().sort_by_distance(p)[0] for p in [
        (-57.172997458, 9.036604802, 6.463720248),
        (-42.369399545, 9.036604802, 8.284270209),
    ]]
    fillet(redondeo10_edges, radius=REDONDEO10_R)

    # Simetría3: Saliente-Extruir8 across plane
    add(saliente_extruir8.mirror(Plane(origin=(0, 21.036604802, 0), x_dir=(0, 0, 1), z_dir=(0, -1, 0))))

    # Redondeo10 of Simetría3
    redondeo10_of_simetr_a3_edges = [part.edges().sort_by_distance(p)[0] for p in [
        (-57.172997458, 33.036604802, 6.463720248),
        (-42.369399545, 33.036604802, 8.284270209),
    ]]
    fillet(redondeo10_of_simetr_a3_edges, radius=REDONDEO10_OF_SIMETR_A3_R)


solid = part.part
